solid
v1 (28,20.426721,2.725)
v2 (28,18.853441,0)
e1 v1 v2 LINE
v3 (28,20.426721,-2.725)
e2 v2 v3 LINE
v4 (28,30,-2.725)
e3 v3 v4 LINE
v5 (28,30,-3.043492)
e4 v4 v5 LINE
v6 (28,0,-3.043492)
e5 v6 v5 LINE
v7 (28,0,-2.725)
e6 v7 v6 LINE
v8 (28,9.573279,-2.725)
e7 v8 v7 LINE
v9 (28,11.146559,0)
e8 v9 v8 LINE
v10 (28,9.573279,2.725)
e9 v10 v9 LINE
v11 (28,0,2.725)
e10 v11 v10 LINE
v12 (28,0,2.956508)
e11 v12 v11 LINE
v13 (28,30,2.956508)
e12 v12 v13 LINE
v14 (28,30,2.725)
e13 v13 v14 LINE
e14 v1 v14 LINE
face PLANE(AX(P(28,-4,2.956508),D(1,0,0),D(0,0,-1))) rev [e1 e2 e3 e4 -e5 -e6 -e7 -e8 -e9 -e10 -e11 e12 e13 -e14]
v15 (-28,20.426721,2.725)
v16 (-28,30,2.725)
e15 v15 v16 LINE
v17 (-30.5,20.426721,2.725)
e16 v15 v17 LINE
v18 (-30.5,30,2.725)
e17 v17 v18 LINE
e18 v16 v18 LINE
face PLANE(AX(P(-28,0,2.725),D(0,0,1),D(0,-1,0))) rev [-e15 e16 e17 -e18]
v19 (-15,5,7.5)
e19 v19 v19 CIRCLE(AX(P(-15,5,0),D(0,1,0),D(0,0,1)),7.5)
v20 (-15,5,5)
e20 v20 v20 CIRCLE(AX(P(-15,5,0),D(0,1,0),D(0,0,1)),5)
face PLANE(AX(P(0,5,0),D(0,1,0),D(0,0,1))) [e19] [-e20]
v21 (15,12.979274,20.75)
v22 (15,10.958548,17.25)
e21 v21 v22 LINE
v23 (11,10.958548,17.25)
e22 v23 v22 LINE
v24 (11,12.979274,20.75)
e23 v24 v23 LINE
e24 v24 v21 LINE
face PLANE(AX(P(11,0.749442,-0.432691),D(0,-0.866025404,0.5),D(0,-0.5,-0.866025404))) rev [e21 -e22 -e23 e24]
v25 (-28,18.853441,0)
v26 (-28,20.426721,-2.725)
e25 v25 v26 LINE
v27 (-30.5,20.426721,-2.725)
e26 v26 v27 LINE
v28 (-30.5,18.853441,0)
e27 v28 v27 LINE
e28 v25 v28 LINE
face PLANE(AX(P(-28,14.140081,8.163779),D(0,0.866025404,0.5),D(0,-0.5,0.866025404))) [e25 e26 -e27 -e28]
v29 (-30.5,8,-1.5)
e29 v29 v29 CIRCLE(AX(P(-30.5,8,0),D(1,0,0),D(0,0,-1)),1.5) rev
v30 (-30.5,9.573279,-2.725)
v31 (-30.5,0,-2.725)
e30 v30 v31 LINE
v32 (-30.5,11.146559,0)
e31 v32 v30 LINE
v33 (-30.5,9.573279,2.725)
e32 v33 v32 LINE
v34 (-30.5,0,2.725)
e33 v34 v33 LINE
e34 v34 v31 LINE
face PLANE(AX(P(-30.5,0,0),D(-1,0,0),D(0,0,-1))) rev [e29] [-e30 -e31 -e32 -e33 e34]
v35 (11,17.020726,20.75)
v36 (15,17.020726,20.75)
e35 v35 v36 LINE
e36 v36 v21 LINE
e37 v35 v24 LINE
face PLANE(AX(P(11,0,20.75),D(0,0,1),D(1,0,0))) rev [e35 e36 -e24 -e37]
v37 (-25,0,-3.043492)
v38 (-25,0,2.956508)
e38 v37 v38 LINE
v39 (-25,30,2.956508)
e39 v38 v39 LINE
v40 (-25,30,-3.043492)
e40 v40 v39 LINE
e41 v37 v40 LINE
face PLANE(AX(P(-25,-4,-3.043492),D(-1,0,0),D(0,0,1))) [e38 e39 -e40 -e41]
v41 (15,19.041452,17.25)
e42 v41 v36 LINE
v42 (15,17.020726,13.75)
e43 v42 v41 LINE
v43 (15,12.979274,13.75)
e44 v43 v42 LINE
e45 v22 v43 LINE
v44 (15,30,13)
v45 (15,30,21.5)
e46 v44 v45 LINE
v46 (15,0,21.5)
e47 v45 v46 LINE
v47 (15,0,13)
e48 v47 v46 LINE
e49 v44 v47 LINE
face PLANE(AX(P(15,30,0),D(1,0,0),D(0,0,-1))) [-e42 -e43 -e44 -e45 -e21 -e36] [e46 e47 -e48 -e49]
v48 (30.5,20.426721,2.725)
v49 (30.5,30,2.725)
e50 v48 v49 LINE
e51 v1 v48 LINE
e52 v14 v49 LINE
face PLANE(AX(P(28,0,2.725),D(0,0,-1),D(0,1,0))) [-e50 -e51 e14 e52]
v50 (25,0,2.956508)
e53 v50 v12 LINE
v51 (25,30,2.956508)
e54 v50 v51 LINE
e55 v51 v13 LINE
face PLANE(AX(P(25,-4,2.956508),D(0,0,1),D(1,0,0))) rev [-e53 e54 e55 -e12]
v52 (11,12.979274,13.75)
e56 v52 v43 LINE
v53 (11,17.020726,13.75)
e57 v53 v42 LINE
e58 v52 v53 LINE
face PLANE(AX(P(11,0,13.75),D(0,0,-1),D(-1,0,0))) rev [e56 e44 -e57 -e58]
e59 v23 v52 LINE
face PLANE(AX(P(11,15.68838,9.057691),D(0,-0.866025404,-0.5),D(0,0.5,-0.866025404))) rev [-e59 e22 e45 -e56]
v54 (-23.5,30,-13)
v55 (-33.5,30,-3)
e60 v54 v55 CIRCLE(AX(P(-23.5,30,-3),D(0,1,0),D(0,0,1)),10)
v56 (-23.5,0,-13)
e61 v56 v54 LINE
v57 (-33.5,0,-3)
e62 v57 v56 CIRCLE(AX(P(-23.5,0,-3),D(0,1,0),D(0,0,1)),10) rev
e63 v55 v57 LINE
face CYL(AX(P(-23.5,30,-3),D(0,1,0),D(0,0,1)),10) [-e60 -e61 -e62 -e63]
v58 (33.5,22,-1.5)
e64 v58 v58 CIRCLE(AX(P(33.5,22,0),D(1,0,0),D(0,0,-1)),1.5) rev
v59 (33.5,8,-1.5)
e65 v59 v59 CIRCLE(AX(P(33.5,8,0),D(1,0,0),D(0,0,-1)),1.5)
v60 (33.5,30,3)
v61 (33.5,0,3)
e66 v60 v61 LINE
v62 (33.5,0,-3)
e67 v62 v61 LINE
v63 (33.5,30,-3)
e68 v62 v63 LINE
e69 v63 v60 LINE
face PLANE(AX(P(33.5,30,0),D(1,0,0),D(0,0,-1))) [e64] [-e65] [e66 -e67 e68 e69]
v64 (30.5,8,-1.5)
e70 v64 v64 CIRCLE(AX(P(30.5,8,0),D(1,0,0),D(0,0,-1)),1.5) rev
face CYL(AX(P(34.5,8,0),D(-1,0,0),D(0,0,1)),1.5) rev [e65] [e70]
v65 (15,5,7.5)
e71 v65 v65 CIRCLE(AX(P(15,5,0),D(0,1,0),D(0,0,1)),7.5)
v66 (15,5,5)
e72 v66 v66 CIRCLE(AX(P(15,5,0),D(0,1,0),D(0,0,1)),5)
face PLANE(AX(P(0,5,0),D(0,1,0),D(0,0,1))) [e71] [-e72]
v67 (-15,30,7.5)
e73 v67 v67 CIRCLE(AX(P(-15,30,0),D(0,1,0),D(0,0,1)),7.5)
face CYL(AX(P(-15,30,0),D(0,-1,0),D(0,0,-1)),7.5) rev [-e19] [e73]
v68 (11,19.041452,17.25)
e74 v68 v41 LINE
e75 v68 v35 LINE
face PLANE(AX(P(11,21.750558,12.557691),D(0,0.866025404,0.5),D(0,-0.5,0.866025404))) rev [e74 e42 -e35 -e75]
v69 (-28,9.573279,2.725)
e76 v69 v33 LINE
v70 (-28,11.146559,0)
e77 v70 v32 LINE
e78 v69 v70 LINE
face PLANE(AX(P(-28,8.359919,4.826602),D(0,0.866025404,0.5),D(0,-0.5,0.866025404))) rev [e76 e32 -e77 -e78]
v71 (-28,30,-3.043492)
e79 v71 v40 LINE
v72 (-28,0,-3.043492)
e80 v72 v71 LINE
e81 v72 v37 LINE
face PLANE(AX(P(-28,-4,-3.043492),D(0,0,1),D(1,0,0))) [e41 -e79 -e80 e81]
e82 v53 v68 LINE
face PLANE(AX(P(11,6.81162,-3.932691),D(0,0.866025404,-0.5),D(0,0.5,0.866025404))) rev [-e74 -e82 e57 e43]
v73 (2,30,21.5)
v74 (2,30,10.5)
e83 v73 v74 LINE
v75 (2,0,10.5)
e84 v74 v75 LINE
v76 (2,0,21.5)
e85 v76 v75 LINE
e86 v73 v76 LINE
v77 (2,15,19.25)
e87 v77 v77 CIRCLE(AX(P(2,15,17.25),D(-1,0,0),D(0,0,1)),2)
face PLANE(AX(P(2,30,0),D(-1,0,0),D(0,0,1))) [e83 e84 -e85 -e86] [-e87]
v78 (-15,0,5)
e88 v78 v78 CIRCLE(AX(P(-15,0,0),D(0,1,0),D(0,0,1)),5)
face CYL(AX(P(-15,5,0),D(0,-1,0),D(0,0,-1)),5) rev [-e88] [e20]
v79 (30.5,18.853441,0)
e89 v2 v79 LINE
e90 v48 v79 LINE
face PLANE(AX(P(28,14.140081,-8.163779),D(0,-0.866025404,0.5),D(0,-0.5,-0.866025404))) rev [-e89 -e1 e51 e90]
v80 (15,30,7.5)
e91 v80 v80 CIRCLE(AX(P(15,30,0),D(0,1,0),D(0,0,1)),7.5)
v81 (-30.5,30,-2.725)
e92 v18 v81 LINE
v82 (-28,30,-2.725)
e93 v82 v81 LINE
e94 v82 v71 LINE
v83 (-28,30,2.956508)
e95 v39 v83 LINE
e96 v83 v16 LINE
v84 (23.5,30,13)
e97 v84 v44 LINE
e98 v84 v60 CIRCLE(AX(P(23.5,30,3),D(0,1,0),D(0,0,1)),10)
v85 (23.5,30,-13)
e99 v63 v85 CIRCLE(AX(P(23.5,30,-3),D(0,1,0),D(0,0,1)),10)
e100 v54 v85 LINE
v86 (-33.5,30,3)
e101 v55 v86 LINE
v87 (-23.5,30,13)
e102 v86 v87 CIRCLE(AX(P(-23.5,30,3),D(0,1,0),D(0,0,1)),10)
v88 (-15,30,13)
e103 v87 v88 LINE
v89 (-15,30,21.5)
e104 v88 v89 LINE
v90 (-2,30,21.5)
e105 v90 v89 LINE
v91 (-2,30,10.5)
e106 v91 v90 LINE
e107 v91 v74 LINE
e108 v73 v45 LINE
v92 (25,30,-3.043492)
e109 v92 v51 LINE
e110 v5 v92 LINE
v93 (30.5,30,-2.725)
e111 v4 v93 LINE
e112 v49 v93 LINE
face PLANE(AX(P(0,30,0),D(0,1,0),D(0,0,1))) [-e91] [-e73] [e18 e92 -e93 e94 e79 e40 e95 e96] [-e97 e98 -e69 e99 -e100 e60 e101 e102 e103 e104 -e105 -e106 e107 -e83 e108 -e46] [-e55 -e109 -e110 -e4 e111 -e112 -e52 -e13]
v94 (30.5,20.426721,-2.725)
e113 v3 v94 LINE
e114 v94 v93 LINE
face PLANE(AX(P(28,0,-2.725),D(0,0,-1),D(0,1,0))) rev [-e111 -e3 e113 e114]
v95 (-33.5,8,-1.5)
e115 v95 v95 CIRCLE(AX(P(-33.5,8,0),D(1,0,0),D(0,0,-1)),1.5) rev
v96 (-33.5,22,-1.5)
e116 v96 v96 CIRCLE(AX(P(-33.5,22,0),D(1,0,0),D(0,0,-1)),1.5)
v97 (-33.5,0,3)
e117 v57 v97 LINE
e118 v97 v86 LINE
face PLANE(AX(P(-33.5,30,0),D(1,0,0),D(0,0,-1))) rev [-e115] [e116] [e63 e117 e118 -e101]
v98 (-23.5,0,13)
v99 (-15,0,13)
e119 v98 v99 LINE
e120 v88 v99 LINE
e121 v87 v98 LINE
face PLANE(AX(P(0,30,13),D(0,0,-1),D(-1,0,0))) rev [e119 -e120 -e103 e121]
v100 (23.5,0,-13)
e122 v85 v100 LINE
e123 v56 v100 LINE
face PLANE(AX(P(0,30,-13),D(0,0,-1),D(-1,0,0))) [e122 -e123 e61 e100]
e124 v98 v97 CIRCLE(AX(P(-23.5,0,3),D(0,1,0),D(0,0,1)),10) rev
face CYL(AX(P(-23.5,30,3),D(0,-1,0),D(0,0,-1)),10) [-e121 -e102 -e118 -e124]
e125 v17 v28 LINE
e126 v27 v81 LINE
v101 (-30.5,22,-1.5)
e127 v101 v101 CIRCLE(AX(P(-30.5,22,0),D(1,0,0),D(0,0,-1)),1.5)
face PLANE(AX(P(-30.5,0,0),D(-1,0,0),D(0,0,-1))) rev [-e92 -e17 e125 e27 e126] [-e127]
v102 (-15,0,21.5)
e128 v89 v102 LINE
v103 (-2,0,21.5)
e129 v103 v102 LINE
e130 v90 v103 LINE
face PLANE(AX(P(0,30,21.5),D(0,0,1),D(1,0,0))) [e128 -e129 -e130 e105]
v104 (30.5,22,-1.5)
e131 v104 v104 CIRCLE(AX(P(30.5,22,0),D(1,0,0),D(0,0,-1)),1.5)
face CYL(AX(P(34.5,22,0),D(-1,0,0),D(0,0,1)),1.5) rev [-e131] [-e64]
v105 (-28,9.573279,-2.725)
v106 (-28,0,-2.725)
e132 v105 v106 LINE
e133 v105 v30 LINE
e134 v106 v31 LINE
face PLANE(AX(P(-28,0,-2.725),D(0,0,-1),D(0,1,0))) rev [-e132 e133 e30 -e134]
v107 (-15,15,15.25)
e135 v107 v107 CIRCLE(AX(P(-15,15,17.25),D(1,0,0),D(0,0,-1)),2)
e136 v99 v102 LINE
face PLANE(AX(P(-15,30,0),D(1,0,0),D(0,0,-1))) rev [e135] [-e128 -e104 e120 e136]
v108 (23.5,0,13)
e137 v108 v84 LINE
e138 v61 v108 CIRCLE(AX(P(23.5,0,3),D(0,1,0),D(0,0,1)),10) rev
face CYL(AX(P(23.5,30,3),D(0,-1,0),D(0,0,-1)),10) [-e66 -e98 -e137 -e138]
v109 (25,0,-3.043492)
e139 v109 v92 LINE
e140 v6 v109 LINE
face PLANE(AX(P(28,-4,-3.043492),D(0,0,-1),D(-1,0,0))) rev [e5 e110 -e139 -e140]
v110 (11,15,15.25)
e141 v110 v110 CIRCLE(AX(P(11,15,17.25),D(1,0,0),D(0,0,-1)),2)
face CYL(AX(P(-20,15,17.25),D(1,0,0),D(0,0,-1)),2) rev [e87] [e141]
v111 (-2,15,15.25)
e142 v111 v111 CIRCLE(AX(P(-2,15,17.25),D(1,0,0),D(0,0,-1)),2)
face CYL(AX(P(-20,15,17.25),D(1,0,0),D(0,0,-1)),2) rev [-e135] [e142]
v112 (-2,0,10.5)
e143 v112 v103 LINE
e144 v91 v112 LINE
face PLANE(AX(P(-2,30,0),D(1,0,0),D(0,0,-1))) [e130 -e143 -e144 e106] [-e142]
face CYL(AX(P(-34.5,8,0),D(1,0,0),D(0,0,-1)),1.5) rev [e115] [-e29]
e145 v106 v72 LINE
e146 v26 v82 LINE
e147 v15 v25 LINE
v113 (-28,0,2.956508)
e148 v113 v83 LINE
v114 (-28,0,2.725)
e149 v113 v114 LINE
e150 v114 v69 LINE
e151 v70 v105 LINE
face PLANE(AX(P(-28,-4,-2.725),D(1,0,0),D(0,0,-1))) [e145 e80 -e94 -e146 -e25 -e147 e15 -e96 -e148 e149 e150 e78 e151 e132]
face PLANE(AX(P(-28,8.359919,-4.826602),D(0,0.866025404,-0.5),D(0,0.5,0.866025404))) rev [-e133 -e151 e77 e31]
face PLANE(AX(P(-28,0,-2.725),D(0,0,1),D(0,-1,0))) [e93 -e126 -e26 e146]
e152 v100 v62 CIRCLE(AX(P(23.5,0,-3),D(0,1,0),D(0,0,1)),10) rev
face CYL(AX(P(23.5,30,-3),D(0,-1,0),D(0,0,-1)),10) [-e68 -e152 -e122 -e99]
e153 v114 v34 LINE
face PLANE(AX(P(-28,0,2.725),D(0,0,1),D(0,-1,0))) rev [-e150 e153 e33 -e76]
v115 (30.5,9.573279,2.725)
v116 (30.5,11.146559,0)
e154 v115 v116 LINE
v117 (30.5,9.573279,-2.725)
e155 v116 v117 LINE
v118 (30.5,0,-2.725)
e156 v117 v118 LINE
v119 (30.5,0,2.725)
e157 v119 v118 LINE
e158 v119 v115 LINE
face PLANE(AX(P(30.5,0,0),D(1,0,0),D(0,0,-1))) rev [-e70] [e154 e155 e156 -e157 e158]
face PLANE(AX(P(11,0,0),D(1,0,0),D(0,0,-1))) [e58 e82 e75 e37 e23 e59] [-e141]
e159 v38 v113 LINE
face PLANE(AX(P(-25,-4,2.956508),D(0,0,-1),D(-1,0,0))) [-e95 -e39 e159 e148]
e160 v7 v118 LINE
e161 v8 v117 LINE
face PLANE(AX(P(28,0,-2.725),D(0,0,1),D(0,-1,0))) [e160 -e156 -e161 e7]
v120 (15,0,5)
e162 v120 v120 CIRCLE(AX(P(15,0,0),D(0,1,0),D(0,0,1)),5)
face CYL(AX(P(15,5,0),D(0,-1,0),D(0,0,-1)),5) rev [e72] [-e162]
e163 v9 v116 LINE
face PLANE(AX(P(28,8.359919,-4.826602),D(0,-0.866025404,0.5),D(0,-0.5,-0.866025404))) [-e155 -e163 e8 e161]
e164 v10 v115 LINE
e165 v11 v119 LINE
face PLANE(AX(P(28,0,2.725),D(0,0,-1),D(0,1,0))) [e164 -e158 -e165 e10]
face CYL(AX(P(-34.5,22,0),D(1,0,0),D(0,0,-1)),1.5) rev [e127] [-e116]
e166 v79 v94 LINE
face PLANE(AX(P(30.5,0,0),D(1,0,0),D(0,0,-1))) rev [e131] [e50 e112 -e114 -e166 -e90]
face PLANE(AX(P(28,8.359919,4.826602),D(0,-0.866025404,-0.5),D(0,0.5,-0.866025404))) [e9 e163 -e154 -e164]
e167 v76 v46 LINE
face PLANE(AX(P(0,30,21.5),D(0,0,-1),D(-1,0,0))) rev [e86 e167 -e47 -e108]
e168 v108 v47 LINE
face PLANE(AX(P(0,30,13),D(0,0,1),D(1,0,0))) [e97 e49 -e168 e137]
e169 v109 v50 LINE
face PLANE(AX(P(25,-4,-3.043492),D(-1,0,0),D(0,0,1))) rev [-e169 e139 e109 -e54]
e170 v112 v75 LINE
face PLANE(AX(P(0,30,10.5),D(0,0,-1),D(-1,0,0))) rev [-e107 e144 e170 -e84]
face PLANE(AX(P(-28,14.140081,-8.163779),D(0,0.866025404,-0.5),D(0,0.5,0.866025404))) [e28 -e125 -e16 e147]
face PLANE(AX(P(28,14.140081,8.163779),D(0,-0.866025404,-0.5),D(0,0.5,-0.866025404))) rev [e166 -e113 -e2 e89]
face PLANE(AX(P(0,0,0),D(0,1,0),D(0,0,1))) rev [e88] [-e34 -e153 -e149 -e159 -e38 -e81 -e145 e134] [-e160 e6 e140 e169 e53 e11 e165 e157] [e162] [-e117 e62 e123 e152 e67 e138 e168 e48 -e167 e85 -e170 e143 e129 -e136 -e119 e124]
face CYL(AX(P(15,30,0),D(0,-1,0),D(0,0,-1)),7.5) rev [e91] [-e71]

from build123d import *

# Parameters (mm, degrees)
BOSS_EXTRUDE1_OUTLINE_R = 7.5
BOSS_EXTRUDE1_DEPTH     = 30
SKETCH1_3_R             = 7.5
SKETCH1_3_R_2           = 5
BOSS_EXTRUDE2_DEPTH     = 5
FILLET1_R               = 10
CUT_EXTRUDE6_DEPTH      = 4
SKETCH5_3_R             = 2
CUT_EXTRUDE7_DEPTH      = 35
SKETCH10_R              = 1.5
CUT_EXTRUDE11_DEPTH     = 4
CUT_EXTRUDE12_START     = -2.5
SKETCH10_5_R            = 1.5
CUT_EXTRUDE12_DEPTH     = 2.5
CUT_EXTRUDE13_DEPTH     = 34


# Read off the part's stored shape, not the designer's step: Boss-Extrude1
with BuildPart() as part:
    # Boss-Extrude1 outline → Boss-Extrude1 (new body)
    with BuildSketch(Plane(origin=(0, 0, 0), x_dir=(1, 0, 0), z_dir=(0, 1, 0))):
        Polygon((-33.5, 13), (-33.5, -13), (-15, -13), (-15, -21.5), (-2, -21.5), (-2, -10.5), (2, -10.5), (2, -21.5), (15, -21.5), (15, -13), (33.5, -13), (33.5, 13), align=None)
        with Locations((-15, 0)):
            Circle(BOSS_EXTRUDE1_OUTLINE_R, mode=Mode.SUBTRACT)
        with Locations((15, 0)):
            Circle(BOSS_EXTRUDE1_OUTLINE_R, mode=Mode.SUBTRACT)
    extrude(amount=BOSS_EXTRUDE1_DEPTH)

    # Sketch1<3> → Boss-Extrude2 (add)
    # profile 1 of 2: a face of its own
    with BuildSketch(Plane(origin=(0, 0, 0), x_dir=(1, 0, 0), z_dir=(0, 1, 0))):
        with Locations(Location((-15, 0, 0), (0, 0, 270))):
            Circle(SKETCH1_3_R)
        with Locations(Location((-15, 0, 0), (0, 0, 270))):
            Circle(SKETCH1_3_R_2, mode=Mode.SUBTRACT)
    # profile 2 of 2: a face of its own
    with BuildSketch(Plane(origin=(0, 0, 0), x_dir=(1, 0, 0), z_dir=(0, 1, 0))):
        with Locations(Location((15, 0, 0), (0, 0, 270))):
            Circle(SKETCH1_3_R)
        with Locations(Location((15, 0, 0), (0, 0, 270))):
            Circle(SKETCH1_3_R_2, mode=Mode.SUBTRACT)
    extrude(amount=BOSS_EXTRUDE2_DEPTH)

    # Fillet1
    fillet1_edges = [part.edges().sort_by_distance(p)[0] for p in [
        (-33.5, 15, -13),
        (33.5, 15, -13),
        (33.5, 15, 13),
        (-33.5, 15, 13),
    ]]
    fillet(fillet1_edges, radius=FILLET1_R)

    # Sketch5 → Cut-Extrude6 (cut)
    with BuildSketch(Plane(origin=(15, 0, 0), x_dir=(0, 0, -1), z_dir=(1, 0, 0))):
        with BuildLine():
            Line((-20.75, 17.020725942), (-20.75, 15))
            Line((-20.75, 15), (-19.25, 15))
            ThreePointArc((-19.25, 15), (-17.25, 17), (-15.25, 15))
            Line((-15.25, 15), (-13.75, 15))
            Line((-13.75, 15), (-13.75, 17.020725942))
            Line((-13.75, 17.020725942), (-17.25, 19.041451884))
            Line((-17.25, 19.041451884), (-20.75, 17.020725942))
        make_face()
        with BuildLine():
            Line((-19.25, 15), (-20.75, 15))
            Line((-20.75, 15), (-20.75, 12.979274058))
            Line((-20.75, 12.979274058), (-17.25, 10.958548116))
            Line((-17.25, 10.958548116), (-13.75, 12.979274058))
            Line((-13.75, 12.979274058), (-13.75, 15))
            Line((-13.75, 15), (-15.25, 15))
            ThreePointArc((-15.25, 15), (-17.25, 13), (-19.25, 15))
        make_face()
    extrude(amount=-CUT_EXTRUDE6_DEPTH, mode=Mode.SUBTRACT)

    # Sketch5<3> → Cut-Extrude7 (cut)
    with BuildSketch(Plane(origin=(15, 0, 0), x_dir=(0, 0, -1), z_dir=(1, 0, 0))):
        with Locations((-17.25, 15)):
            Circle(SKETCH5_3_R)
    extrude(amount=-CUT_EXTRUDE7_DEPTH, mode=Mode.SUBTRACT)

    # Sketch10 → Cut-Extrude11 (cut)
    with BuildSketch(Plane(origin=(30.5, 0, 0), x_dir=(0, 0, -1), z_dir=(1, 0, 0))):
        with Locations((0, 22)):
            Circle(SKETCH10_R)
        with Locations((0, 8)):
            Circle(SKETCH10_R)
    cut_extrude11 = extrude(amount=CUT_EXTRUDE11_DEPTH, mode=Mode.SUBTRACT)

    # Sketch10<5> → Cut-Extrude12 (cut)
    # profile 1 of 5: a face of its own
    with BuildSketch(Plane(origin=(30.5, 0, 0), x_dir=(0, 0, -1), z_dir=(1, 0, 0)).offset(CUT_EXTRUDE12_START)):
        Polygon((-2.725, 30), (2.725, 30), (2.725, 23.573279484), (0, 25.146558967), (-2.725, 23.573279484), align=None)
    # profile 2 of 5: a face of its own
    with BuildSketch(Plane(origin=(30.5, 0, 0), x_dir=(0, 0, -1), z_dir=(1, 0, 0)).offset(CUT_EXTRUDE12_START)):
        Polygon((2.725, 20.426720516), (2.725, 23.573279484), (0, 25.146558967), (-2.725, 23.573279484), (-2.725, 20.426720516), (0, 18.853441033), align=None)
        with Locations((0, 22)):
            Circle(SKETCH10_5_R, mode=Mode.SUBTRACT)
    # profile 3 of 5: a face of its own
    with BuildSketch(Plane(origin=(30.5, 0, 0), x_dir=(0, 0, -1), z_dir=(1, 0, 0)).offset(CUT_EXTRUDE12_START)):
        with Locations((0, 22)):
            Circle(SKETCH10_5_R)
    # profile 4 of 5: a face of its own
    with BuildSketch(Plane(origin=(30.5, 0, 0), x_dir=(0, 0, -1), z_dir=(1, 0, 0)).offset(CUT_EXTRUDE12_START)):
        Polygon((-2.725, 6.426720516), (-2.725, 9.573279484), (0, 11.146558967), (2.725, 9.573279484), (2.725, 6.426720516), (2.725, 0), (-2.725, 0), align=None)
        with Locations((0, 8)):
            Circle(SKETCH10_5_R, mode=Mode.SUBTRACT)
    # profile 5 of 5: a face of its own
    with BuildSketch(Plane(origin=(30.5, 0, 0), x_dir=(0, 0, -1), z_dir=(1, 0, 0)).offset(CUT_EXTRUDE12_START)):
        with Locations((0, 8)):
            Circle(SKETCH10_5_R)
    cut_extrude12 = extrude(amount=CUT_EXTRUDE12_DEPTH, mode=Mode.SUBTRACT)

    # Sketch11 → Cut-Extrude13 (cut)
    with BuildSketch(Plane(origin=(0, 30, 0), x_dir=(1, 0, 0), z_dir=(0, 1, 0))):
        Polygon((28, 2.725), (28, 3.043492212), (25, 3.043492212), (25, -2.956507788), (28, -2.956507788), (28, -2.638015576), align=None)
    cut_extrude13 = extrude(amount=-CUT_EXTRUDE13_DEPTH, mode=Mode.SUBTRACT)

    # Mirror1: Cut-Extrude11, Cut-Extrude12, Cut-Extrude13 across plane
    add(cut_extrude11.mirror(Plane(origin=(0, 0, 0), x_dir=(0, 0, 1), z_dir=(1, 0, 0))), mode=Mode.SUBTRACT)
    add(cut_extrude12.mirror(Plane(origin=(0, 0, 0), x_dir=(0, 0, 1), z_dir=(1, 0, 0))), mode=Mode.SUBTRACT)
    add(cut_extrude13.mirror(Plane(origin=(0, 0, 0), x_dir=(0, 0, 1), z_dir=(1, 0, 0))), mode=Mode.SUBTRACT)


solid = part.part
